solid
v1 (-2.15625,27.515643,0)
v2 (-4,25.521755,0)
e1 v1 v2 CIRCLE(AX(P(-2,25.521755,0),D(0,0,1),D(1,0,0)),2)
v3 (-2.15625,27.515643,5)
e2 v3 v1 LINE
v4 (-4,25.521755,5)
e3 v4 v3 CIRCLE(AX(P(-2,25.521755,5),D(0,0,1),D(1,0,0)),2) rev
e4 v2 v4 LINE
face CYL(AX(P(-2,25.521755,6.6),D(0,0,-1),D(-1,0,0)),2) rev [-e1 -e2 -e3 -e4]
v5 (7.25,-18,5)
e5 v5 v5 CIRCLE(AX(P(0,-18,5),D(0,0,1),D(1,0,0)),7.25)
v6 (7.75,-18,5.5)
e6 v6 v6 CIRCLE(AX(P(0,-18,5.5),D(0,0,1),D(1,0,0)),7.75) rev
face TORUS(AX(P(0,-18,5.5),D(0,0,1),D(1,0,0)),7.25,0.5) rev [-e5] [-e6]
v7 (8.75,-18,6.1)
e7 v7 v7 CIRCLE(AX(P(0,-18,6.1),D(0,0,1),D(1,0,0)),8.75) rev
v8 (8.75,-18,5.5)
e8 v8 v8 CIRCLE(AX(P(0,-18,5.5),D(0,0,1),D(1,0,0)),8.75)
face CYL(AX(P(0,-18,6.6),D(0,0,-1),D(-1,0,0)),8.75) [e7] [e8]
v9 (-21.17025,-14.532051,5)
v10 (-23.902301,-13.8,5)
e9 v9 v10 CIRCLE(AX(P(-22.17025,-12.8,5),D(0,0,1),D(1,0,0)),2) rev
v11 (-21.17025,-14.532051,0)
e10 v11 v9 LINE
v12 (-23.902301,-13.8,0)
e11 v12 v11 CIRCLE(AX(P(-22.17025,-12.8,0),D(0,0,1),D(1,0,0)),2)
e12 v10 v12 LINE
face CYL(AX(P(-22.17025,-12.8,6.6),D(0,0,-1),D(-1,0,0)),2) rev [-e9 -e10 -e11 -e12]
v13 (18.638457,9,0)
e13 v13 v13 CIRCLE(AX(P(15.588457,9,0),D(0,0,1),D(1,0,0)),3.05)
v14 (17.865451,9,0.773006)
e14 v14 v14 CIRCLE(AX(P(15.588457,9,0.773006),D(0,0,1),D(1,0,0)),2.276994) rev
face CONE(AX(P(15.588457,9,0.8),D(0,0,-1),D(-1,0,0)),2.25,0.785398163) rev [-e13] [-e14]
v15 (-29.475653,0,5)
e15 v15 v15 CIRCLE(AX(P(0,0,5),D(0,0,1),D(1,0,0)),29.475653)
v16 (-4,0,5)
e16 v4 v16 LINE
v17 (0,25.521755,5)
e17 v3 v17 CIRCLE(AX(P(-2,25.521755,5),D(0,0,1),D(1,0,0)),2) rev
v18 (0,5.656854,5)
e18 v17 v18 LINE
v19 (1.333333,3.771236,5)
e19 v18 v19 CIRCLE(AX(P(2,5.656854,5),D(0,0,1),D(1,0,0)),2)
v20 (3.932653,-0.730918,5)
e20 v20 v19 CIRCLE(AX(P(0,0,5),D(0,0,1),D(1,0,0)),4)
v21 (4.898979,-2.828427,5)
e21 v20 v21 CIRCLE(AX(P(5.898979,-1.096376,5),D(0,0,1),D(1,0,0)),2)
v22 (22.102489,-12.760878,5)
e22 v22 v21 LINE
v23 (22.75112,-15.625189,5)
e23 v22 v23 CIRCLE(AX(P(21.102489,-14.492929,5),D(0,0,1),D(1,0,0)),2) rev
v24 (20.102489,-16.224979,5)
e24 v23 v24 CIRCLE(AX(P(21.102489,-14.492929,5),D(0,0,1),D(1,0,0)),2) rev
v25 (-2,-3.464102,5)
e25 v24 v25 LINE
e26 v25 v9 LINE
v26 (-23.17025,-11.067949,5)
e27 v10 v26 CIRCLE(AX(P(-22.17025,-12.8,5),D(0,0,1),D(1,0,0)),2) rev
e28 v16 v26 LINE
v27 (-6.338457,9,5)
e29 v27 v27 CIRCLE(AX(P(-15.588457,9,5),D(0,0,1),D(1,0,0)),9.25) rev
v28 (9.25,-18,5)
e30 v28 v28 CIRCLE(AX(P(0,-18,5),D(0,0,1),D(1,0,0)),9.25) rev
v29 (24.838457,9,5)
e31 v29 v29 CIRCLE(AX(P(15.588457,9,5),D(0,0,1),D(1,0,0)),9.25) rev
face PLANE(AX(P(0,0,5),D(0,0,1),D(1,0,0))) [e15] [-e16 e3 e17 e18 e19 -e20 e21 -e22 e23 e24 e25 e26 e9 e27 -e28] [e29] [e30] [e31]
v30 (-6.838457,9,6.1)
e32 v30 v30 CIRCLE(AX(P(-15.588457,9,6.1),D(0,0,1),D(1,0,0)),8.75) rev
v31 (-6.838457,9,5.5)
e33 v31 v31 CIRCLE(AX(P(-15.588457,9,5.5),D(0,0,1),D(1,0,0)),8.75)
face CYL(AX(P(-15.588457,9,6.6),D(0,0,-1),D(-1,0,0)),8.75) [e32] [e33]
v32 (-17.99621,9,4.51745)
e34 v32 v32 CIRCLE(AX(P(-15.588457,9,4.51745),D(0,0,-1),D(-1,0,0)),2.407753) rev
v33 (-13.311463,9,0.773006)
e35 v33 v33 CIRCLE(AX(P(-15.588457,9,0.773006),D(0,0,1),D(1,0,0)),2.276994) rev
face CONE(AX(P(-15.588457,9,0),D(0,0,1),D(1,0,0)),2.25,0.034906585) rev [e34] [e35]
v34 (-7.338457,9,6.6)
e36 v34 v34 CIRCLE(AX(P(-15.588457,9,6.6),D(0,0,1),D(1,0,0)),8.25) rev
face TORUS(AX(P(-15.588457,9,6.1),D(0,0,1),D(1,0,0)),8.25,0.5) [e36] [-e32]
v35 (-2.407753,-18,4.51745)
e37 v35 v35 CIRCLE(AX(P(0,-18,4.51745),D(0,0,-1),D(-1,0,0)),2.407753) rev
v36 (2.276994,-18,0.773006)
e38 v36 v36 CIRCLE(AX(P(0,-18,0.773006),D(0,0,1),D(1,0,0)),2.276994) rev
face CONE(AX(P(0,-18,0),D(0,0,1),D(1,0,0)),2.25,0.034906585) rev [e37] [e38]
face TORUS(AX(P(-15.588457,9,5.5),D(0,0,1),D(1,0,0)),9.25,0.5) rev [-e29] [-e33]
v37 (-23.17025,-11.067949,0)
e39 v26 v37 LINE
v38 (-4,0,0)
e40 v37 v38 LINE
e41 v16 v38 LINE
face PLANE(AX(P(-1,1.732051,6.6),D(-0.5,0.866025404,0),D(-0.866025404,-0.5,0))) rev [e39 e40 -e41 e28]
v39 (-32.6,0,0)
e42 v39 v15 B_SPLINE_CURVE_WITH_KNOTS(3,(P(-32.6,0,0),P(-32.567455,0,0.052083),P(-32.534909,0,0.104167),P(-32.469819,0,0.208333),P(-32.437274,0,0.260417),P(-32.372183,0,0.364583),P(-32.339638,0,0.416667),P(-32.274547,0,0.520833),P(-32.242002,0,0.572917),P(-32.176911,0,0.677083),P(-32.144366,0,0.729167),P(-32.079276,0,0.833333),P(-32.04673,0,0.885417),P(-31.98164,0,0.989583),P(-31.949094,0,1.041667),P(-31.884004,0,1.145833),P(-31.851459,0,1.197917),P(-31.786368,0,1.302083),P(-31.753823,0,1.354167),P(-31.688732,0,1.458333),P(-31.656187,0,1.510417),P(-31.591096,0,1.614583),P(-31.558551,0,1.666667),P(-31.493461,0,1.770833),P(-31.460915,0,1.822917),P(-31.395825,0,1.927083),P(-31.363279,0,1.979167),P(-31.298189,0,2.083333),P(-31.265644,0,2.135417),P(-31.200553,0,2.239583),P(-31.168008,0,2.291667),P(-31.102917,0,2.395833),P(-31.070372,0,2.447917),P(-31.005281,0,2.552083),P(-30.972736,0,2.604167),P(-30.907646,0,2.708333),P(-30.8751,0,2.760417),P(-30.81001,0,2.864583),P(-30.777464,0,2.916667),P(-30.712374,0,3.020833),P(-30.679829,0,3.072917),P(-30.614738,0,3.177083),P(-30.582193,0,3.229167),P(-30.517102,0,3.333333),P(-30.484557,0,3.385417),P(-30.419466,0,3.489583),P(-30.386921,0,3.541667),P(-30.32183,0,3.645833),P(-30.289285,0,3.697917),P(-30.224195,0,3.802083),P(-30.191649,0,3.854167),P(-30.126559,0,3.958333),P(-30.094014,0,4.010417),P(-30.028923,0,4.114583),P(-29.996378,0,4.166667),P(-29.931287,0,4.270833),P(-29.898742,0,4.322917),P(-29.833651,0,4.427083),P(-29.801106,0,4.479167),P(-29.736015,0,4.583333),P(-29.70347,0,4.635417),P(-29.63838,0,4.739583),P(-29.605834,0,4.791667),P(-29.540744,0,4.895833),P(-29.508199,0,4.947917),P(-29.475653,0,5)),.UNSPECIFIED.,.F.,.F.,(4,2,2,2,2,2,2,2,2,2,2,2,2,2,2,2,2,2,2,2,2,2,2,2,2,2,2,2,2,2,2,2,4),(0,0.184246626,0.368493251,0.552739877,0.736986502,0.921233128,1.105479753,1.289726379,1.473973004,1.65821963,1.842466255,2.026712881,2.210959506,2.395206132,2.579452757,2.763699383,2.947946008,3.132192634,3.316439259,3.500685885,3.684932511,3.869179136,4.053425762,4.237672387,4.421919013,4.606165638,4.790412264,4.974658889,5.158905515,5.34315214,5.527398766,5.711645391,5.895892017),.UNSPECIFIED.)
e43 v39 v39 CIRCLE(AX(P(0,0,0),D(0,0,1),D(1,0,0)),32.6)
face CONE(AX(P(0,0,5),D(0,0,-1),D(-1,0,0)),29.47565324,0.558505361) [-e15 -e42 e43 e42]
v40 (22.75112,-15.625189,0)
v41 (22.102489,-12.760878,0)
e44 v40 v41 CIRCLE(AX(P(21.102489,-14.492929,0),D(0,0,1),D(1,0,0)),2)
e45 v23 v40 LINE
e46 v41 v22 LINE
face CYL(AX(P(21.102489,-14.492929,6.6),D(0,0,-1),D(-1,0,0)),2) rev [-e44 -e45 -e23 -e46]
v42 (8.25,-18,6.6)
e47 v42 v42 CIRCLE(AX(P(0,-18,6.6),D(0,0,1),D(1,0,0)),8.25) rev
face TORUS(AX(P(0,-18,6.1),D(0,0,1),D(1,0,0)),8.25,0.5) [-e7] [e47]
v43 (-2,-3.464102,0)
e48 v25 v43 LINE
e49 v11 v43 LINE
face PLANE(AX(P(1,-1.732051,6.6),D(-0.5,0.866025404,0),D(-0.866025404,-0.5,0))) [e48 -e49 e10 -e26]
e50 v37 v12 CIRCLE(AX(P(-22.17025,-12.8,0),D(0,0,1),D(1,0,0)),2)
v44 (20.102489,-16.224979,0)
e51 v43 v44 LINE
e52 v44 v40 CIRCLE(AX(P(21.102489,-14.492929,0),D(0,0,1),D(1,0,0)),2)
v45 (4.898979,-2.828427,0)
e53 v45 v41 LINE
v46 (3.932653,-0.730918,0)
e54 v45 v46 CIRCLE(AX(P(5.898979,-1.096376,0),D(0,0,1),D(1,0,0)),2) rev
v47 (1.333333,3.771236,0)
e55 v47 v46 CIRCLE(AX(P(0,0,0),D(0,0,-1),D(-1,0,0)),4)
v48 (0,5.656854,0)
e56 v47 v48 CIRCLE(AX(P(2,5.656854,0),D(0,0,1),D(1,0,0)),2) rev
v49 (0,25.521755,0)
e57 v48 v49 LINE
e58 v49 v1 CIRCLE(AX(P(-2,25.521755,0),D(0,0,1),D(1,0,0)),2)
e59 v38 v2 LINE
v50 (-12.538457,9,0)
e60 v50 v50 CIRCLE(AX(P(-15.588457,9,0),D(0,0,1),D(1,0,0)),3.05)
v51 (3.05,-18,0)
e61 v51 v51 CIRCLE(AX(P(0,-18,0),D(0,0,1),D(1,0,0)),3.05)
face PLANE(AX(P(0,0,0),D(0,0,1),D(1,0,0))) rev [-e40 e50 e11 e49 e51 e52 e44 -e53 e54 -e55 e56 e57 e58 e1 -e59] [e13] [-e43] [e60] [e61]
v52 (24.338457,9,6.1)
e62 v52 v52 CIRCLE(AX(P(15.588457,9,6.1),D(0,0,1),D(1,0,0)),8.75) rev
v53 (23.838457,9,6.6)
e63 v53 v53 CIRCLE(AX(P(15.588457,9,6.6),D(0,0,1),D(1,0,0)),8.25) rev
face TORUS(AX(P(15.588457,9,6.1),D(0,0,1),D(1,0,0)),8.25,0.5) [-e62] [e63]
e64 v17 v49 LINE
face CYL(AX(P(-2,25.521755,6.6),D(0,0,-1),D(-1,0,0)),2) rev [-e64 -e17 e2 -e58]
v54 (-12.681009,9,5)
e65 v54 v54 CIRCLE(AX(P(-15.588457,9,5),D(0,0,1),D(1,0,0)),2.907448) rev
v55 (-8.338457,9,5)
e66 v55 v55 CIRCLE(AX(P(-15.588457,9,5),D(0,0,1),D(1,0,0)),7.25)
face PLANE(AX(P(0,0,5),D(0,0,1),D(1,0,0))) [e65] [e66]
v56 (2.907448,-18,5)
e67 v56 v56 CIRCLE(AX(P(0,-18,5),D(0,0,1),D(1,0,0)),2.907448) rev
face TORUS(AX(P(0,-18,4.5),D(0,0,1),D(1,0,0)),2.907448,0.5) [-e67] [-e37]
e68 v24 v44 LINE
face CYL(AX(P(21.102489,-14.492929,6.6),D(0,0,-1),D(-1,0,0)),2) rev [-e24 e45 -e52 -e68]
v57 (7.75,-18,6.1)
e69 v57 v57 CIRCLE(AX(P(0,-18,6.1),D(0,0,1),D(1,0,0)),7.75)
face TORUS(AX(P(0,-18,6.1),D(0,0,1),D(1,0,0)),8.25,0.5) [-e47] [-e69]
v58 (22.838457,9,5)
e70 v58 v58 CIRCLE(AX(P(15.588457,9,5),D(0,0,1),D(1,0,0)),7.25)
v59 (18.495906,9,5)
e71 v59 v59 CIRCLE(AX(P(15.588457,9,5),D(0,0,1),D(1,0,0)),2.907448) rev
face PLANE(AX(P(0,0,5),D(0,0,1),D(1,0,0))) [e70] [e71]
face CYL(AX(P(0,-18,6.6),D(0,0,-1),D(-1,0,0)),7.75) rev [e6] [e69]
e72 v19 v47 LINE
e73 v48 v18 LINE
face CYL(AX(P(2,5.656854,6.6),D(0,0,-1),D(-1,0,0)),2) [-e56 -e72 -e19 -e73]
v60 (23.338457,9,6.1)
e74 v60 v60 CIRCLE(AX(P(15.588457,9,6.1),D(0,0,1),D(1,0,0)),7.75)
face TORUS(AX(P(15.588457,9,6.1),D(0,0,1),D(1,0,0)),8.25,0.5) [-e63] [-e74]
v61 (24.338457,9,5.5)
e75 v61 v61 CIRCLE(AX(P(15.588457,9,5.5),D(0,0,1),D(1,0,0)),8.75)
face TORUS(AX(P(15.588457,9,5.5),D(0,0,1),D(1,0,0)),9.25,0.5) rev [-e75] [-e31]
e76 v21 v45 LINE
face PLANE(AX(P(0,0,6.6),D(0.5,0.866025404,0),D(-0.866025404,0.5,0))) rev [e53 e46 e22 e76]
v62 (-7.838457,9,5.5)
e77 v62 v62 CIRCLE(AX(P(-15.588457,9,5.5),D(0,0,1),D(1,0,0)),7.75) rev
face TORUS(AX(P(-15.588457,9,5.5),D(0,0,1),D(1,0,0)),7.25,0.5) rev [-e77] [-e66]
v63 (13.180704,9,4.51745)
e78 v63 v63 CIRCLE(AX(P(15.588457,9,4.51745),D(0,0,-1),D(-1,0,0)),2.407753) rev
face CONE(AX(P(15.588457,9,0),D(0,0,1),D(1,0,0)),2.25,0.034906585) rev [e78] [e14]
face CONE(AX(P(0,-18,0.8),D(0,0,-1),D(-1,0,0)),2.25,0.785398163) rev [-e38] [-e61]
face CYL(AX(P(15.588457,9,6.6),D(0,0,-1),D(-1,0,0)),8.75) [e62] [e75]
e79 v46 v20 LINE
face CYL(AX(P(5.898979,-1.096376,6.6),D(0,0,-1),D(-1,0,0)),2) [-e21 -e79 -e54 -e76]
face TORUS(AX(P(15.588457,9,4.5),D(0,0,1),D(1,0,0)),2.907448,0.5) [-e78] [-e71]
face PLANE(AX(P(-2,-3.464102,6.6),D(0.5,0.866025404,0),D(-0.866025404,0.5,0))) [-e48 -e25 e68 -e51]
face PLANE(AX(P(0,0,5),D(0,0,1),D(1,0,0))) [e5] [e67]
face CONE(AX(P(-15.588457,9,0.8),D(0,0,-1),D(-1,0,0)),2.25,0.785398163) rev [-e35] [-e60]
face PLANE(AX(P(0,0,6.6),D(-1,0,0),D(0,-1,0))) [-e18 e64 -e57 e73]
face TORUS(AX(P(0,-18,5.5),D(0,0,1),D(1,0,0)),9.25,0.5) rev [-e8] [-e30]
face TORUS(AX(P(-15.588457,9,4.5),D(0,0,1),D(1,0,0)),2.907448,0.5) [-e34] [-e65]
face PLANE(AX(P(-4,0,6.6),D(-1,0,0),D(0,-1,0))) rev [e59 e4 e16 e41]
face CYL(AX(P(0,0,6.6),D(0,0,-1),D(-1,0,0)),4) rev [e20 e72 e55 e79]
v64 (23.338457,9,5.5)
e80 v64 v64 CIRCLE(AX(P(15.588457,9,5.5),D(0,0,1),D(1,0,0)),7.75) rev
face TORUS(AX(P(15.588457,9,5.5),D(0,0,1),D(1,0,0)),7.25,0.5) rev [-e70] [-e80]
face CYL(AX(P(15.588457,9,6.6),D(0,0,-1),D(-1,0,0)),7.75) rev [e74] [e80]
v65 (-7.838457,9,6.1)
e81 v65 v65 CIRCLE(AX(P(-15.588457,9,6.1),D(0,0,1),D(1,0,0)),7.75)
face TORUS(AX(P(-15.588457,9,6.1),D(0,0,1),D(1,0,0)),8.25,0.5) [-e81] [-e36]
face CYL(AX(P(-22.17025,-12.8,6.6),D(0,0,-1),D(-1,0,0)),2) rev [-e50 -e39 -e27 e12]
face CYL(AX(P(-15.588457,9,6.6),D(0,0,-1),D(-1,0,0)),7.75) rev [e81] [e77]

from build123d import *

# Parameters (mm, degrees)
SKETCH1_R                   = 32.6
BOSS_EXTRUDE1_DEPTH         = 5
CHAMFER1_SIZE               = 5
CHAMFER1_SIZE_2             = 3.12434676
CUT_EXTRUDE1_START          = 5
SKETCH2_R                   = 2.25
CUT_EXTRUDE1_DEPTH          = 52.373699443
CUT_EXTRUDE1_DRAFT          = 2
SKETCH3_R                   = 8.75
SKETCH3_R_2                 = 7.75
BOSS_EXTRUDE2_DEPTH         = 1.6
SKETCH5_R                   = 3.25
CUT_EXTRUDE3_DEPTH          = 0.8
FILLET1_R                   = 0.5
FILLET2_R                   = 0.5
CIRPATTERN3_COUNT           = 3
CIRPATTERN3_START           = 5
CIRPATTERN3_COPY_1_SKETCH_R = 2.25
CIRPATTERN3_COPY_1_DEPTH    = 52.373699443
CIRPATTERN3_COPY_1_DRAFT    = 2
CIRPATTERN3_COPY_2_SKETCH_R = 2.25
CIRPATTERN3_COPY_2_DEPTH    = 52.373699443
CIRPATTERN3_COPY_2_DRAFT    = 2
FILLET1_OF_CIRPATTERN3_R    = 0.5
FILLET2_OF_CIRPATTERN3_R    = 0.5
SKETCH4_R                   = 4
CUT_EXTRUDE2_DEPTH          = 47.573382971
FILLET3_R                   = 2


with BuildPart() as part:
    # Sketch1 → Boss-Extrude1 (new body)
    with BuildSketch(Plane(origin=(0, 0, 0), x_dir=(0, 1, 0), z_dir=(0, 0, 1))):
        with Locations(Location((0, 0, 0), (0, 0, 270))):
            Circle(SKETCH1_R)
    extrude(amount=BOSS_EXTRUDE1_DEPTH)

    # Chamfer1
    # the kernel refuses this chamfer: 5, 3.12434676 mm, written as the material it takes off along each edge
    with BuildSketch(Plane(origin=(0, 0, 5), x_dir=(1, 0, 0), z_dir=(0, -1, 0))) as chamfer1_piece_1:
        Polygon((32.6, -CHAMFER1_SIZE), (32.6 - CHAMFER1_SIZE_2, 0), (32.6, 0), align=None)
    revolve(axis=Axis((0, 0, 5), (0, 0, 1)), mode=Mode.SUBTRACT)


with BuildPart() as cut_extrude1_tool:
    # Sketch2 → Cut-Extrude1 (with draft: the straight prism first)
    with BuildSketch(Plane(origin=(0, 0, 5), x_dir=(1, 0, 0), z_dir=(0, 0, -1)).offset(CUT_EXTRUDE1_START)):
        with Locations((0, 18)):
            Circle(SKETCH2_R)
    extrude(amount=-CUT_EXTRUDE1_DEPTH)
    # Cut-Extrude1: the draft: its side faces are tilted about the plane it starts from
    cut_extrude1_sides = [cut_extrude1_tool.faces().sort_by_distance(p)[0] for p in [
        (-2.25, -18, 26.186849721),
    ]]
    draft(cut_extrude1_sides, Plane(origin=(0, 0, 5), x_dir=(1, 0, 0), z_dir=(0, 0, -1)).offset(CUT_EXTRUDE1_START), CUT_EXTRUDE1_DRAFT)


with BuildPart() as part_1:
    add(part.part)

    # Cut-Extrude1: cut by cut_extrude1_tool
    add(cut_extrude1_tool.part, mode=Mode.SUBTRACT)

    # Sketch3 → Boss-Extrude2 (add)
    with BuildSketch(Plane.XY.offset(5)):
        with Locations((0, -18)):
            Circle(SKETCH3_R)
        with Locations((0, -18)):
            Circle(SKETCH3_R_2, mode=Mode.SUBTRACT)
    boss_extrude2 = extrude(amount=BOSS_EXTRUDE2_DEPTH)

    # Sketch5 → Cut-Extrude3 (cut)
    with BuildSketch(Plane(origin=(0, 0, 0), x_dir=(1, 0, 0), z_dir=(0, 0, -1))):
        with Locations(Location((0, 18, 0), (0, 0, 180))):
            Circle(SKETCH5_R)
    cut_extrude3 = extrude(amount=-CUT_EXTRUDE3_DEPTH, mode=Mode.SUBTRACT)

    # Fillet1
    fillet1_edges = [part_1.edges().sort_by_distance(p)[0] for p in [
        (-8.75, -18, 6.6),
        (-7.75, -18, 6.6),
    ]]
    fillet(fillet1_edges, radius=FILLET1_R - 0.0001)  # a hair under: the kernel refuses the full size

    # Fillet2
    fillet2_edges = [part_1.edges().sort_by_distance(p)[0] for p in [
        (-2.424603847, -18, 5),
        (-7.75, -18, 5),
        (-8.75, -18, 5),
    ]]
    fillet(fillet2_edges, radius=FILLET2_R)

    # CirPattern3: Boss-Extrude2, Cut-Extrude3 ×3 about axis
    cirpattern3_axis = Axis((0, 0, 0), (0, 0, 1))
    add([boss_extrude2.rotate(cirpattern3_axis, i * 360 / CIRPATTERN3_COUNT) for i in range(1, CIRPATTERN3_COUNT)])
    add([cut_extrude3.rotate(cirpattern3_axis, i * 360 / CIRPATTERN3_COUNT) for i in range(1, CIRPATTERN3_COUNT)], mode=Mode.SUBTRACT)


with BuildPart() as cirpattern3_copy_1_tool:
    # CirPattern3 copy 1 sketch → CirPattern3 copy 1 (with draft: the straight prism first)
    with BuildSketch(Plane(origin=(0, 0, 5), x_dir=(-0.4999999999999998, 0.8660254037844387, 0), z_dir=(0, 0, -1)).offset(CIRPATTERN3_START)):
        with Locations((0, 18)):
            Circle(CIRPATTERN3_COPY_1_SKETCH_R)
    extrude(amount=-CIRPATTERN3_COPY_1_DEPTH)
    # CirPattern3 copy 1: the draft: its side faces are tilted about the plane it starts from
    cirpattern3_copy_1_sides = [cirpattern3_copy_1_tool.faces().sort_by_distance(p)[0] for p in [
        (16.713457268, 7.051442841, 26.186849721),
    ]]
    draft(cirpattern3_copy_1_sides, Plane(origin=(0, 0, 5), x_dir=(-0.4999999999999998, 0.8660254037844387, 0), z_dir=(0, 0, -1)).offset(CIRPATTERN3_START), CIRPATTERN3_COPY_1_DRAFT)


with BuildPart() as part_2:
    add(part_1.part)

    # CirPattern3 copy 1: cut by cirpattern3_copy_1_tool
    add(cirpattern3_copy_1_tool.part, mode=Mode.SUBTRACT)


with BuildPart() as cirpattern3_copy_2_tool:
    # CirPattern3 copy 2 sketch → CirPattern3 copy 2 (with draft: the straight prism first)
    with BuildSketch(Plane(origin=(0, 0, 5), x_dir=(-0.5000000000000004, -0.8660254037844384, 0), z_dir=(0, 0, -1)).offset(CIRPATTERN3_START)):
        with Locations((0, 18)):
            Circle(CIRPATTERN3_COPY_2_SKETCH_R)
    extrude(amount=-CIRPATTERN3_COPY_2_DEPTH)
    # CirPattern3 copy 2: the draft: its side faces are tilted about the plane it starts from
    cirpattern3_copy_2_sides = [cirpattern3_copy_2_tool.faces().sort_by_distance(p)[0] for p in [
        (-14.463457268, 10.948557159, 26.186849721),
    ]]
    draft(cirpattern3_copy_2_sides, Plane(origin=(0, 0, 5), x_dir=(-0.5000000000000004, -0.8660254037844384, 0), z_dir=(0, 0, -1)).offset(CIRPATTERN3_START), CIRPATTERN3_COPY_2_DRAFT)


with BuildPart() as part_3:
    add(part_2.part)

    # CirPattern3 copy 2: cut by cirpattern3_copy_2_tool
    add(cirpattern3_copy_2_tool.part, mode=Mode.SUBTRACT)

    # Fillet1 of CirPattern3
    fillet1_of_cirpattern3_edges = [part_3.edges().sort_by_distance(p)[0] for p in [
        (19.963457268, 1.422277717, 6.6),
        (19.463457268, 2.288303121, 6.6),
        (-11.213457268, 16.577722283, 6.6),
        (-11.713457268, 15.711696879, 6.6),
    ]]
    fillet(fillet1_of_cirpattern3_edges, radius=FILLET1_OF_CIRPATTERN3_R - 0.0001)  # a hair under: the kernel refuses the full size

    # Fillet2 of CirPattern3
    fillet2_of_cirpattern3_edges = [part_3.edges().sort_by_distance(p)[0] for p in [
        (16.800759192, 6.900231474, 5),
        (19.463457268, 2.288303121, 5),
        (19.963457268, 1.422277717, 5),
        (-14.376155344, 11.099768526, 5),
        (-11.713457268, 15.711696879, 5),
        (-11.213457268, 16.577722283, 5),
    ]]
    fillet(fillet2_of_cirpattern3_edges, radius=FILLET2_OF_CIRPATTERN3_R)

    # Sketch4 → Cut-Extrude2 (cut, through all)
    with BuildSketch(Plane(origin=(0, 0, 0), x_dir=(1, 0, 0), z_dir=(0, 0, -1))):
        with BuildLine():
            Line((21.649947146, 17.118404966), (-2, 3.464101615))
            ThreePointArc((-2, 3.464101615), (1.03527618, 3.863703305), (3.464101615, 2))
            Line((3.464101615, 2), (23.902301144, 13.8))
            ThreePointArc((23.902301144, 13.8), (22.836479237, 15.500168259), (21.649947146, 17.118404966))
        make_face()
        Circle(SKETCH4_R)
        with BuildLine():
            ThreePointArc((0, -4), (-2.828427125, -2.828427125), (-4, 0))
            Line((-4, 0), (-4, -27.308606702))
            ThreePointArc((-4, -27.308606702), (-2.005299856, -27.527055282), (0, -27.6))
            Line((0, -27.6), (0, -4))
        make_face()
        with BuildLine():
            ThreePointArc((-22.839463081, 15.495771235), (-23.902301144, 13.8), (-24.839463081, 12.03166962))
            Line((-24.839463081, 12.03166962), (-4, 0))
            ThreePointArc((-4, 0), (-3.464101615, 2), (-2, 3.464101615))
            Line((-2, 3.464101615), (-22.839463081, 15.495771235))
        make_face()
    extrude(amount=-CUT_EXTRUDE2_DEPTH, mode=Mode.SUBTRACT)

    # Fillet3
    fillet3_edges = [part_3.edges().sort_by_distance(p)[0] for p in [
        (-24.839463081, -12.03166962, 2.5),
        (-22.839463081, -15.495771235, 2.5),
        (0, 27.6, 2.5),
        (-4, 27.308606702, 2.5),
        (3.464101615, -2, 2.5),
        (0, 4, 2.5),
        (21.649947146, -17.118404966, 2.5),
        (23.902301144, -13.8, 2.5),
    ]]
    fillet(fillet3_edges, radius=FILLET3_R - 0.0001)  # a hair under: the kernel refuses the full size

    # Chamfer2: read off the stored shape, not the designer's step
    # Chamfer2 outline → Chamfer2 (revolve)
    with BuildSketch(Plane(origin=(15.588457268, 9, 0), x_dir=(1, 0, 0), z_dir=(0, -1, 0))):
        Polygon((2.276993966, 0.773006034), (3.05, 0), (3.25, 0), (3.25, 0.8), (2.276993966, 0.8), align=None)
    revolve(axis=Axis((15.588457268, 9, 0), (0, 0, 1)))

    # Chamfer2 2 outline → Chamfer2 2 (revolve)
    with BuildSketch(Plane.XZ.offset(18)):
        Polygon((2.276993966, 0.773006034), (3.05, 0), (3.25, 0), (3.25, 0.8), (2.276993966, 0.8), align=None)
    revolve(axis=Axis((0, -18, 0), (0, 0, 1)))

    # Chamfer2 3 outline → Chamfer2 3 (revolve)
    with BuildSketch(Plane(origin=(-15.588457268, 9, 0), x_dir=(1, 0, 0), z_dir=(0, -1, 0))):
        Polygon((2.276993966, 0.773006034), (3.05, 0), (3.25, 0), (3.25, 0.8), (2.276993966, 0.8), align=None)
    revolve(axis=Axis((-15.588457268, 9, 0), (0, 0, 1)))


solid = part_3.part
